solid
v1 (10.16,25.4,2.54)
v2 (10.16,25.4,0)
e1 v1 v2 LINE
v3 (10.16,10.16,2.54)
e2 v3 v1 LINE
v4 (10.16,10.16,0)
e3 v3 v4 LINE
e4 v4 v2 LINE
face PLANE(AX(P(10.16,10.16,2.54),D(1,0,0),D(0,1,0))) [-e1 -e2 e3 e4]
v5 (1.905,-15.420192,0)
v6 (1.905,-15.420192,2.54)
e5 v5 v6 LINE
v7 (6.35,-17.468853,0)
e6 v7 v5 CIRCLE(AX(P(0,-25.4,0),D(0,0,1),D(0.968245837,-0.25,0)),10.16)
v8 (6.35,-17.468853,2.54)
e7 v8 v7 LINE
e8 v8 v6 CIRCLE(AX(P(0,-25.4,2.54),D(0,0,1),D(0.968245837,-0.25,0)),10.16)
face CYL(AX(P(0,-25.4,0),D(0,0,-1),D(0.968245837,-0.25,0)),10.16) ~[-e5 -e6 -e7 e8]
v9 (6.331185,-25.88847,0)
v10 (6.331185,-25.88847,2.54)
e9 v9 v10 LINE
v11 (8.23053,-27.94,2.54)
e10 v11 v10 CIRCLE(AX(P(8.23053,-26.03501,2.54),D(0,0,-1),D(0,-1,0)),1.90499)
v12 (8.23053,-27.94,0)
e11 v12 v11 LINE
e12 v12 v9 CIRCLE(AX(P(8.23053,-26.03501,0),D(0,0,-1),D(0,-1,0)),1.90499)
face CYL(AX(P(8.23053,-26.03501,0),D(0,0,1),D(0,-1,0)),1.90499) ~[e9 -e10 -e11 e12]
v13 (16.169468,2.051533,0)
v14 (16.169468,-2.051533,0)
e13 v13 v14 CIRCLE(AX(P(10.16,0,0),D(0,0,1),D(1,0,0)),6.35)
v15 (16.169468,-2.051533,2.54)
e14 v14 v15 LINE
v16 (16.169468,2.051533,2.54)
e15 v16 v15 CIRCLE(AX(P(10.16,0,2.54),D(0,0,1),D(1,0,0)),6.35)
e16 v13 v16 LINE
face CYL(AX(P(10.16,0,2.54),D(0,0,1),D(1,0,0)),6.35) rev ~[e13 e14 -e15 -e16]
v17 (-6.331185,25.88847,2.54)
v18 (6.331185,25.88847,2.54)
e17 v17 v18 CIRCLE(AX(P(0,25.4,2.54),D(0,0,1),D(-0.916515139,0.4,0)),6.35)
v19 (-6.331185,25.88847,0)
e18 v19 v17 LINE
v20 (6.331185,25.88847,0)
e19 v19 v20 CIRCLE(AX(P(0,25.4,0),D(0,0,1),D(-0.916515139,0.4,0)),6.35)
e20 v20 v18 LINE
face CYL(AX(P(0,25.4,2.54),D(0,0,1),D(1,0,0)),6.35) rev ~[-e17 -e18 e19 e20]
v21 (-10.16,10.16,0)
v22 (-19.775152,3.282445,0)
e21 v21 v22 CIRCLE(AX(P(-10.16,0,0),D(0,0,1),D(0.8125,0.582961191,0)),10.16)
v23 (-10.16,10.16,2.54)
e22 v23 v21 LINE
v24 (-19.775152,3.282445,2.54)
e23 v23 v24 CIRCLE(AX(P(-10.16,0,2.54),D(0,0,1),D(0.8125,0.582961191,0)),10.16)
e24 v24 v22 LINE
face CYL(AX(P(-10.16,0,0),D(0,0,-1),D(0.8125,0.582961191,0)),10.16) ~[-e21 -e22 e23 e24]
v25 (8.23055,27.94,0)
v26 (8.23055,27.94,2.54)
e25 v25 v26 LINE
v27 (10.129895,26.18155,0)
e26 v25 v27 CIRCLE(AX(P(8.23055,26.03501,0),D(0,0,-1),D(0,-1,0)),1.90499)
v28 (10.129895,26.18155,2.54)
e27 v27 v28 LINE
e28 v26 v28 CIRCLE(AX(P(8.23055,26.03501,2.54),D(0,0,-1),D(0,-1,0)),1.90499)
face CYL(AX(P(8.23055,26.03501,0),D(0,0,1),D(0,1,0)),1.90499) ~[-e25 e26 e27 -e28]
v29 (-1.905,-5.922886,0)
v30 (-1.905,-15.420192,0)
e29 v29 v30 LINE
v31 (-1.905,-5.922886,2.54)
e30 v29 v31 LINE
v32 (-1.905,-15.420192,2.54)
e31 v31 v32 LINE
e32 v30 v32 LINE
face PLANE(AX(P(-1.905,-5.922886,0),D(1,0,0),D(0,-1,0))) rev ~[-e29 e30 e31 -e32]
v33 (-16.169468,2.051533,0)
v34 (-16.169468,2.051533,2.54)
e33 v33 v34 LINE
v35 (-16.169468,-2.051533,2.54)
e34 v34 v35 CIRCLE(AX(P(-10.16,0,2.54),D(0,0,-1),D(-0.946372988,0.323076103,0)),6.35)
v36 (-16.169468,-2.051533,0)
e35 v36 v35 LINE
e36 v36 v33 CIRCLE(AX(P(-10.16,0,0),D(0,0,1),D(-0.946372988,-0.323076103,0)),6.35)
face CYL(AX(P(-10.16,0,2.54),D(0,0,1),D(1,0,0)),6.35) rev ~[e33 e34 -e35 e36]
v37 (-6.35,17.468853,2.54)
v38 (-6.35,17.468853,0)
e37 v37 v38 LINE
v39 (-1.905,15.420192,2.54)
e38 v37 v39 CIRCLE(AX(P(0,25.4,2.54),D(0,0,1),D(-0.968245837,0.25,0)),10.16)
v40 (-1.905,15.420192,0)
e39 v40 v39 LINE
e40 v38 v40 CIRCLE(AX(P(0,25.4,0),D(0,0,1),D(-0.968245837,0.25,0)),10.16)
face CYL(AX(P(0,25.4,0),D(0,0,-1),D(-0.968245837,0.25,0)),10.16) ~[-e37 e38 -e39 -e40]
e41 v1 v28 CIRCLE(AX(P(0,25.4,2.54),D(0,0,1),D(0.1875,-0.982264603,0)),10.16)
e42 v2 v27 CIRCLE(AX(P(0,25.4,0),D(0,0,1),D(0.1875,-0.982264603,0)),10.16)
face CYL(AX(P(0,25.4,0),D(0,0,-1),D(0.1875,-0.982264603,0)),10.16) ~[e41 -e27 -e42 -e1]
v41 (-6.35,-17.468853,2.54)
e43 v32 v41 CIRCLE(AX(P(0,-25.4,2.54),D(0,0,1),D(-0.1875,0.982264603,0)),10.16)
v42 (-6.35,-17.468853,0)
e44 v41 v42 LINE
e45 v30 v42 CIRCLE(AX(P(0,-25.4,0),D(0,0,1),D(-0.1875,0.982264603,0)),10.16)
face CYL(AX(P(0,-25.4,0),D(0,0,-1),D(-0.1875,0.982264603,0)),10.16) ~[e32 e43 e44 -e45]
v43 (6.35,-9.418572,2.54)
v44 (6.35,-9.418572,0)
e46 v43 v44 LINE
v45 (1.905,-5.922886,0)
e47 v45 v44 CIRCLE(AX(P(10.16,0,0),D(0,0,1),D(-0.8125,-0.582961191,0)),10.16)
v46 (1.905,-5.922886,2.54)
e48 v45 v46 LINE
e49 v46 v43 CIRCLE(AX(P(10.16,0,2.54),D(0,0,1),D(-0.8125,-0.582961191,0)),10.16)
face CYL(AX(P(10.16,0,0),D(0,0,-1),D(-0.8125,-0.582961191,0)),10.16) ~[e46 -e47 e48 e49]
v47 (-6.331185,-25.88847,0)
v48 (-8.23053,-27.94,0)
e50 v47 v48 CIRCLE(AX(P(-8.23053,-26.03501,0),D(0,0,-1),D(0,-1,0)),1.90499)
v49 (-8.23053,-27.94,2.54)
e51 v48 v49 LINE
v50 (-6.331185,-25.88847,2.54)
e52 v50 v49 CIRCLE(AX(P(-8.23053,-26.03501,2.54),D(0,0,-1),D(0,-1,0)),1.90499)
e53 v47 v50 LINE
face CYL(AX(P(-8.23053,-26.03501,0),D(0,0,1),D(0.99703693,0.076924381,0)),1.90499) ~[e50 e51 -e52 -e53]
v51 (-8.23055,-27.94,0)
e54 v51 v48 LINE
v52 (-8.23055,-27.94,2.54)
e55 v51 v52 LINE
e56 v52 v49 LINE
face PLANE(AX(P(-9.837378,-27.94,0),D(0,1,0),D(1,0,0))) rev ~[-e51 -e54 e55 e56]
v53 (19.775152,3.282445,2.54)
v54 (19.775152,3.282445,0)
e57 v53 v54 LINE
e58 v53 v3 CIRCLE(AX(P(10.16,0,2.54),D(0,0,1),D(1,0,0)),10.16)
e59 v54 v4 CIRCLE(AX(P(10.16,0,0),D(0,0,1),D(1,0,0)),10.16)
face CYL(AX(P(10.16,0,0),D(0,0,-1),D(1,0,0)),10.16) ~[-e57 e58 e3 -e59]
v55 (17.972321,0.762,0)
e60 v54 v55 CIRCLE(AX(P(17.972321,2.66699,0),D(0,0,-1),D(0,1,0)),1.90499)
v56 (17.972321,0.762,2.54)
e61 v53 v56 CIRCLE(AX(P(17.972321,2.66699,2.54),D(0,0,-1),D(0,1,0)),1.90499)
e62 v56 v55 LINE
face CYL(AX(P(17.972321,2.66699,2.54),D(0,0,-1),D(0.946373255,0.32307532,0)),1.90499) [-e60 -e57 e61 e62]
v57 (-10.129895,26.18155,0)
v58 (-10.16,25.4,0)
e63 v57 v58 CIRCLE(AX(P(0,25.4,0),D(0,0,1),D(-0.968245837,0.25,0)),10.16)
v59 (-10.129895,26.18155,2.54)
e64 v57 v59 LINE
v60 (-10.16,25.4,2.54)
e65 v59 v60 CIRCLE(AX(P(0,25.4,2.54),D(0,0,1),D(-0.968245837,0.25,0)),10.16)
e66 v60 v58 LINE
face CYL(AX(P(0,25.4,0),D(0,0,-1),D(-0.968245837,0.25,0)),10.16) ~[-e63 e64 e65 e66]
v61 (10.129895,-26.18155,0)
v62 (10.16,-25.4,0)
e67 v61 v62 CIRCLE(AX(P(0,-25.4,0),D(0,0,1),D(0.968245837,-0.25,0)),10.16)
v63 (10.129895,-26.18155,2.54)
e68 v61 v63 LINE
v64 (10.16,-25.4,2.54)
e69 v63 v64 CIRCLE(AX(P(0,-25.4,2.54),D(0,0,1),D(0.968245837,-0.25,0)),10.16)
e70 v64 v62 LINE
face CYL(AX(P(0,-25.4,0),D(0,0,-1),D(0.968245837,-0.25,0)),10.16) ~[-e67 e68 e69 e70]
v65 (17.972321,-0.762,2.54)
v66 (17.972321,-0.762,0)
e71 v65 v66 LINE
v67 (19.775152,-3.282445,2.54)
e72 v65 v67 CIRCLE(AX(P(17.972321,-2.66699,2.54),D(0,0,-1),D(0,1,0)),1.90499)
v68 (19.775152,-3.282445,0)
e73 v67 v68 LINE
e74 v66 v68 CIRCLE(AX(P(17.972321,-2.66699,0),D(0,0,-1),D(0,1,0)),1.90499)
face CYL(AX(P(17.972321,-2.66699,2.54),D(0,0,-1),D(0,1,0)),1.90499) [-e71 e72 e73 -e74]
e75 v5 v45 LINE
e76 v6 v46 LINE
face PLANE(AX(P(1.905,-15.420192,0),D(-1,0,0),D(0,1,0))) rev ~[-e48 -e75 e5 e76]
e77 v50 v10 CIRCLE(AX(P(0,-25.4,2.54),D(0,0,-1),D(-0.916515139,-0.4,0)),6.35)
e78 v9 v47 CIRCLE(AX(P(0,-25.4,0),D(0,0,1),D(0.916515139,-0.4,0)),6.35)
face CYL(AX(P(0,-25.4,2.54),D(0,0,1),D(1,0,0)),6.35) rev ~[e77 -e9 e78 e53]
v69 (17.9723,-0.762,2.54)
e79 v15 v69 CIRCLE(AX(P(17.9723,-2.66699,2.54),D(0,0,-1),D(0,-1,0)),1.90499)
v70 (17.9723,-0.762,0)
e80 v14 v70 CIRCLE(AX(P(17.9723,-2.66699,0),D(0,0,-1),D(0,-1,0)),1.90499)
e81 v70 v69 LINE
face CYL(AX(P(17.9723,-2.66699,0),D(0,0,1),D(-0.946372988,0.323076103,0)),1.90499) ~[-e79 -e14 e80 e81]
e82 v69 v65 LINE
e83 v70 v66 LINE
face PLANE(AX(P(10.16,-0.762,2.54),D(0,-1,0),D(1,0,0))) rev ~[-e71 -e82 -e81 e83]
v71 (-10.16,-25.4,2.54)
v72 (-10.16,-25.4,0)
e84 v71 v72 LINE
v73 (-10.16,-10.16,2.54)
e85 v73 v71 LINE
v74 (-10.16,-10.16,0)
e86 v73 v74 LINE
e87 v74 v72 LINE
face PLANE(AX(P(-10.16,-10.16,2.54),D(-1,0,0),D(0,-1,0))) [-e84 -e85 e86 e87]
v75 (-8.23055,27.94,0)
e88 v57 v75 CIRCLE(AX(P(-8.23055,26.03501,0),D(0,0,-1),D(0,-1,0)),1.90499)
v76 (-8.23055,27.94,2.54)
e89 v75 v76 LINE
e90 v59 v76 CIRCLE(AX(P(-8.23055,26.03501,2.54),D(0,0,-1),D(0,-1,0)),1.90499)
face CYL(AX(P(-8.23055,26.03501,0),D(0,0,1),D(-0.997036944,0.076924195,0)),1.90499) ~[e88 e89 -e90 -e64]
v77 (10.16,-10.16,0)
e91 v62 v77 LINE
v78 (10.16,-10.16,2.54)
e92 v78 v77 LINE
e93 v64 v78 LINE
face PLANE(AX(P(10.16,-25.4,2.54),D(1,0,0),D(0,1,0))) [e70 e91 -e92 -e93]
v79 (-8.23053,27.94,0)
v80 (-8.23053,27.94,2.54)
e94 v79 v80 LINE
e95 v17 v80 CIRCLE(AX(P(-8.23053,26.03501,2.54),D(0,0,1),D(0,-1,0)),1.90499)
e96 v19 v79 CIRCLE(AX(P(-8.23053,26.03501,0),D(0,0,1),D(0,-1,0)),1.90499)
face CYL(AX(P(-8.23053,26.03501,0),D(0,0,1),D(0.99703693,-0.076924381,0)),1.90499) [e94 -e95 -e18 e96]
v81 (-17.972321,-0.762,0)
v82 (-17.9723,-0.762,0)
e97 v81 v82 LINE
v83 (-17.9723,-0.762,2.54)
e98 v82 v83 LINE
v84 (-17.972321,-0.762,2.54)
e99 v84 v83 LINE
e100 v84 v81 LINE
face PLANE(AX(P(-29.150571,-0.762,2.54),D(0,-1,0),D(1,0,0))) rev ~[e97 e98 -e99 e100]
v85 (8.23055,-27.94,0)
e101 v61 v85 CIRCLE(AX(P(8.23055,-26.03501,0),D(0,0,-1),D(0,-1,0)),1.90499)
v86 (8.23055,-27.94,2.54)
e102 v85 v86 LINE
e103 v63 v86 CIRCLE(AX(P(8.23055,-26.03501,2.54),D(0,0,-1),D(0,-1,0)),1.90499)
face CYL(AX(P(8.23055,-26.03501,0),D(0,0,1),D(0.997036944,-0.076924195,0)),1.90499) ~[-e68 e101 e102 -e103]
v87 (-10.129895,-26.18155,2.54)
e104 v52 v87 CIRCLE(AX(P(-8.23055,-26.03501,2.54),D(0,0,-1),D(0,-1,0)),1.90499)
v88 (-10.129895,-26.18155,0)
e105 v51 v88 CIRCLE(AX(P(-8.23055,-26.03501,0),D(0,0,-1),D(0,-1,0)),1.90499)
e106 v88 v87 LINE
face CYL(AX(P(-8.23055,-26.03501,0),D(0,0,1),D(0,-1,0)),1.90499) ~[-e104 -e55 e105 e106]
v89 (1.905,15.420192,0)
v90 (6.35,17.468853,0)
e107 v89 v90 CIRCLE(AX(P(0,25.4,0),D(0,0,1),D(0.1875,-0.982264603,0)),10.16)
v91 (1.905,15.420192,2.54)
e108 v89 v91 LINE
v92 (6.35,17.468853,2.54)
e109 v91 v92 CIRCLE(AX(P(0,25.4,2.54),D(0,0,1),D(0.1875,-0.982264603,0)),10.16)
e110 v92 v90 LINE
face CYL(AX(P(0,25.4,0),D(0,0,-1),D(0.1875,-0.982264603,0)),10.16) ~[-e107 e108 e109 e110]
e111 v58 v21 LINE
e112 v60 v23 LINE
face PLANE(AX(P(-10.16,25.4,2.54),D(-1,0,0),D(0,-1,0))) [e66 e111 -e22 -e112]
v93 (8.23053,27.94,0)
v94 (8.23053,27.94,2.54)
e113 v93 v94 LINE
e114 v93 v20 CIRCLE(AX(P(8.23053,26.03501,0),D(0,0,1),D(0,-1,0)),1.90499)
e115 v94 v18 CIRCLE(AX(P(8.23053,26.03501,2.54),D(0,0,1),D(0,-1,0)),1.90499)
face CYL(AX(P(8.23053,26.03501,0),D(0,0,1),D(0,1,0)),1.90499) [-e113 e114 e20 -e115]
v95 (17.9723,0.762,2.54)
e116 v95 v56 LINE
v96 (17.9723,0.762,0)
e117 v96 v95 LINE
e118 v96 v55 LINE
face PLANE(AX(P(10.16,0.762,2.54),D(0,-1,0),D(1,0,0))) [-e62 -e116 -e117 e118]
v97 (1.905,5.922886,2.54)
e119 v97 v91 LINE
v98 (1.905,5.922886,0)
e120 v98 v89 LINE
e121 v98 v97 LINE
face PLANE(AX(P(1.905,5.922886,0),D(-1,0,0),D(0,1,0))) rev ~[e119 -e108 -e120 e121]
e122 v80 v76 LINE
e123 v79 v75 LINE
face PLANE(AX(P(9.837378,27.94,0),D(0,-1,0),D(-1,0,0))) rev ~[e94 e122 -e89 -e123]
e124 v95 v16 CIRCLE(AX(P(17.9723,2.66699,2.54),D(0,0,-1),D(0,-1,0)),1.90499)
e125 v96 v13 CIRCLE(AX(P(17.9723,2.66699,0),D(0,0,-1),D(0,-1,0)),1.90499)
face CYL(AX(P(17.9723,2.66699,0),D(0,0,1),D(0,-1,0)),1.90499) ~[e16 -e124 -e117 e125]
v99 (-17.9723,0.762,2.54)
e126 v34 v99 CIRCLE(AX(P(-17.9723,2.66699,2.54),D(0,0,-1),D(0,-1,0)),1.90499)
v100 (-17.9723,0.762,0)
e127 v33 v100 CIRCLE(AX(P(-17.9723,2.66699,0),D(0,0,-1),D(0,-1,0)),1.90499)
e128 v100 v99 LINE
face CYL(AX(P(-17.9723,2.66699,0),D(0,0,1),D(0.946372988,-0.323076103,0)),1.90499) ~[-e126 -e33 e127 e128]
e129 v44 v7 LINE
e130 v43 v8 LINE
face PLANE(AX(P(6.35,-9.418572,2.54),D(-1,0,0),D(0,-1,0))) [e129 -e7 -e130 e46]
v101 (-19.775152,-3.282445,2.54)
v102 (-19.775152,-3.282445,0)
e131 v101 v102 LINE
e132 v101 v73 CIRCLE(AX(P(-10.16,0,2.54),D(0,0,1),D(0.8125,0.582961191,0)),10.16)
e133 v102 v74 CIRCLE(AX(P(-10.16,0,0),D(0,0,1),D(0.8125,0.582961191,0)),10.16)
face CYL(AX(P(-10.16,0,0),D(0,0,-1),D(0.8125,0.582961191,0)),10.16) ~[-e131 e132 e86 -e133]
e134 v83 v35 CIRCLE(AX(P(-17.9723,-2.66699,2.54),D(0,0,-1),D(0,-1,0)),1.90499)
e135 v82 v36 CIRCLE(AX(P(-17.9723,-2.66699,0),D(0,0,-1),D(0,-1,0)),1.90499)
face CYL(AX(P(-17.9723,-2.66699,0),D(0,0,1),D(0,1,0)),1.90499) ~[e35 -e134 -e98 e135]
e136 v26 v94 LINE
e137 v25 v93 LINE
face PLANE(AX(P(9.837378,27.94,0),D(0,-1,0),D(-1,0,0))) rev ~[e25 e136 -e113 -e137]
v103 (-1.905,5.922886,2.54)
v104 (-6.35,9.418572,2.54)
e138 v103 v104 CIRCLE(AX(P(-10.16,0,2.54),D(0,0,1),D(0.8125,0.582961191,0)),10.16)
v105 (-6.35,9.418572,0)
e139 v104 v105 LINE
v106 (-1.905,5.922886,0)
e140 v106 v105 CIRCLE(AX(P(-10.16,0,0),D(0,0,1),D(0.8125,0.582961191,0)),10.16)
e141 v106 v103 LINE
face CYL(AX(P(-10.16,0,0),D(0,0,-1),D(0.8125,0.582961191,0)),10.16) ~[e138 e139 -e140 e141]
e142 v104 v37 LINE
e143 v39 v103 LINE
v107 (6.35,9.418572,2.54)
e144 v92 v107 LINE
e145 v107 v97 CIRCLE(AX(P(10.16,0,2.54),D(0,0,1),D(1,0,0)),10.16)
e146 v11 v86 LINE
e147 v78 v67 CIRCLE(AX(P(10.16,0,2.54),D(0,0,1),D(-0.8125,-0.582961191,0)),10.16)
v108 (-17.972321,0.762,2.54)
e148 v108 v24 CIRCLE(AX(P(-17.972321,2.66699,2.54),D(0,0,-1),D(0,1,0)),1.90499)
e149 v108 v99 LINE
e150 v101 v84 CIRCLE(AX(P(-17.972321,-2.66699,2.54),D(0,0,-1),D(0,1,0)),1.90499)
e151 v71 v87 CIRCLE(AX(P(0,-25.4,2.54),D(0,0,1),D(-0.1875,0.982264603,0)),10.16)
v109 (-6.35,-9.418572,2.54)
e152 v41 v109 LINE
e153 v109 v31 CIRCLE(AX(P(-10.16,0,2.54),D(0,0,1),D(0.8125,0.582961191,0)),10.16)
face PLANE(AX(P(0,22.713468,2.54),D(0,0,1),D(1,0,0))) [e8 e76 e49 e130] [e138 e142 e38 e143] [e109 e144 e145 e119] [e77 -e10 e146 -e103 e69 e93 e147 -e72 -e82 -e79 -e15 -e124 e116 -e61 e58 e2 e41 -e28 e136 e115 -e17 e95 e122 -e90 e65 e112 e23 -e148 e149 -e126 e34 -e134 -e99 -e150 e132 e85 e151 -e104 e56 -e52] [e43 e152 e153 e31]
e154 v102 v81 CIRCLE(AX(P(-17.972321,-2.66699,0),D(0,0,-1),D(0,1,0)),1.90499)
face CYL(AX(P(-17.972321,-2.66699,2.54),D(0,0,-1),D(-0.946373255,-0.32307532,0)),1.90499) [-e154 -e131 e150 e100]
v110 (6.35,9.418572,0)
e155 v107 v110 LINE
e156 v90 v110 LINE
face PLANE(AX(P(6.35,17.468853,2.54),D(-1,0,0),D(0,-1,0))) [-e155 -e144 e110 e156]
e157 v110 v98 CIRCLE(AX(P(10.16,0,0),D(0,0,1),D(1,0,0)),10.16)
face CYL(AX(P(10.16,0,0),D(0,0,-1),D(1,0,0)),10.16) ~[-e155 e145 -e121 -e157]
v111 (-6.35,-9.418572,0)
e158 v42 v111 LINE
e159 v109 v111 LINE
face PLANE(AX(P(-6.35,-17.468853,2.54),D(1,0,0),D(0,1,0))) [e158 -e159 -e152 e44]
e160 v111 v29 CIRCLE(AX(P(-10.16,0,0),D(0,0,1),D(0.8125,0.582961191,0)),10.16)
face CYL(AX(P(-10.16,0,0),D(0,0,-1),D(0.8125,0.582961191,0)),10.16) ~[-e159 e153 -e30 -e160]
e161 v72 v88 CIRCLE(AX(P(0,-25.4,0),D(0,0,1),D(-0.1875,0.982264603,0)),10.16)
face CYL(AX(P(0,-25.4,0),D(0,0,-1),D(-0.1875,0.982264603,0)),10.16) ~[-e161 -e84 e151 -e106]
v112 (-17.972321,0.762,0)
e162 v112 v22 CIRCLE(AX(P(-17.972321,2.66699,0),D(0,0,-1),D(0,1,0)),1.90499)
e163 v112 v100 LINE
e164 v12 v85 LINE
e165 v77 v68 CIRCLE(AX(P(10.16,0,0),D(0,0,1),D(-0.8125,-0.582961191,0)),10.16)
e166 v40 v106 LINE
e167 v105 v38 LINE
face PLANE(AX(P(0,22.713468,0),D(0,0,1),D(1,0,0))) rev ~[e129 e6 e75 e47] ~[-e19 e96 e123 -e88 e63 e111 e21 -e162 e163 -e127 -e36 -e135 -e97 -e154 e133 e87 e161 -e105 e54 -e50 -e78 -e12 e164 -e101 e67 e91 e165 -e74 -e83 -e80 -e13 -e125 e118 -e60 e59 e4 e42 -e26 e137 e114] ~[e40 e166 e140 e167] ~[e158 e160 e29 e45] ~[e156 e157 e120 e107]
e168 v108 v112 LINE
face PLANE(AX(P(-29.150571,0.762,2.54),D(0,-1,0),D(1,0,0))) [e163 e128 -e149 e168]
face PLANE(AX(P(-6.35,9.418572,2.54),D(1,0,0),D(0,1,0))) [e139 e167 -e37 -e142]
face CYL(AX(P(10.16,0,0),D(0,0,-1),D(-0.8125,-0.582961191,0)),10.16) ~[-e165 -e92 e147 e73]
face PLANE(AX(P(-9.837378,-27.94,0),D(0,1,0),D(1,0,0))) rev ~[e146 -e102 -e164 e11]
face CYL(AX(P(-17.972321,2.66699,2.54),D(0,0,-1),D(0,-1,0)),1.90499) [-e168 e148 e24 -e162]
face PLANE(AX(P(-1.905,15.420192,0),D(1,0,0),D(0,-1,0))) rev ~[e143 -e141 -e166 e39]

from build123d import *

# Parameters (mm, degrees)
F1_DEPTH = 2.54
F2_R     = 6.35
F3_DEPTH = 25.4
F5_DEPTH = 2.54
F6_W     = 18.9905706793
F6_H     = 1.524
F7_DEPTH = 25.4
F8_R     = 1.90499


# Not quite as in the source:
# - a fillet or chamfer is up to 0.001 mm smaller than in the source, because OpenCascade refuses the exact size


with BuildPart() as f1:
    # F0 (on Top) → F1 (new body)
    with BuildSketch(Plane.XY):
        with BuildLine():
            Line((9.8373776994, 27.94), (-9.8373776994, 27.94))
            ThreePointArc((-9.8373776994, 27.94), (-8.5823807234, 19.962322084), (-1.905, 15.4201916351))
            Line((-1.905, 15.4201916351), (-1.905, 25.4))
            Line((-1.905, 25.4), (1.905, 25.4))
            Line((1.905, 25.4), (1.905, 15.4201916351))
            ThreePointArc((1.905, 15.4201916351), (8.5823807234, 19.962322084), (9.8373776994, 27.94))
        make_face()
        with BuildLine():
            Line((-1.905, 25.4), (-1.905, 15.4201916351))
            ThreePointArc((-1.905, 15.4201916351), (0, 15.24), (1.905, 15.4201916351))
            Line((1.905, 15.4201916351), (1.905, 25.4))
            Line((1.905, 25.4), (-1.905, 25.4))
        make_face()
        with BuildLine():
            ThreePointArc((1.905, 15.4201916351), (0, 15.24), (-1.905, 15.4201916351))
            Line((-1.905, 15.4201916351), (-1.905, 5.9228856987))
            ThreePointArc((-1.905, 5.9228856987), (-0.4879681556, 3.1108519733), (0, 0))
            ThreePointArc((0, 0), (0.4879681556, 3.1108519733), (1.905, 5.9228856987))
            Line((1.905, 5.9228856987), (1.905, 15.4201916351))
        make_face()
        with BuildLine():
            ThreePointArc((0, 0), (-0.4879681556, 3.1108519733), (-1.905, 5.9228856987))
            Line((-1.905, 5.9228856987), (-1.905, -5.9228856987))
            ThreePointArc((-1.905, -5.9228856987), (-0.4879681556, -3.1108519733), (0, 0))
        make_face()
        with BuildLine():
            Line((-1.905, -5.9228856987), (-1.905, 5.9228856987))
            ThreePointArc((-1.905, 5.9228856987), (-20.32, 0), (-1.905, -5.9228856987))
        make_face()
        with BuildLine():
            ThreePointArc((20.32, 0), (13.2708519733, 9.6720318444), (1.905, 5.9228856987))
            Line((1.905, 5.9228856987), (1.905, -5.9228856987))
            ThreePointArc((1.905, -5.9228856987), (13.2708519733, -9.6720318444), (20.32, 0))
        make_face()
        with BuildLine():
            Line((1.905, -5.9228856987), (1.905, 5.9228856987))
            ThreePointArc((1.905, 5.9228856987), (0.4879681556, 3.1108519733), (0, 0))
            ThreePointArc((0, 0), (0.4879681556, -3.1108519733), (1.905, -5.9228856987))
        make_face()
        with BuildLine():
            ThreePointArc((0, 0), (-0.4879681556, -3.1108519733), (-1.905, -5.9228856987))
            Line((-1.905, -5.9228856987), (-1.905, -15.4201916351))
            ThreePointArc((-1.905, -15.4201916351), (0, -15.24), (1.905, -15.4201916351))
            Line((1.905, -15.4201916351), (1.905, -5.9228856987))
            ThreePointArc((1.905, -5.9228856987), (0.4879681556, -3.1108519733), (0, 0))
        make_face()
        with BuildLine():
            Line((-1.905, -25.4), (-1.905, -15.4201916351))
            ThreePointArc((-1.905, -15.4201916351), (-8.5823807234, -19.962322084), (-9.8373776994, -27.94))
            Line((-9.8373776994, -27.94), (9.8373776994, -27.94))
            ThreePointArc((9.8373776994, -27.94), (8.5823807234, -19.962322084), (1.905, -15.4201916351))
            Line((1.905, -15.4201916351), (1.905, -25.4))
            Line((1.905, -25.4), (-1.905, -25.4))
        make_face()
        with BuildLine():
            ThreePointArc((1.905, -15.4201916351), (0, -15.24), (-1.905, -15.4201916351))
            Line((-1.905, -15.4201916351), (-1.905, -25.4))
            Line((-1.905, -25.4), (1.905, -25.4))
            Line((1.905, -25.4), (1.905, -15.4201916351))
        make_face()
    extrude(amount=F1_DEPTH)

    # F2 (on face) → F3 (cut)
    with BuildSketch(Plane.XY.offset(2.54)):
        with Locations((0, 25.4)):
            Circle(F2_R)
        with Locations((10.16, 0)):
            Circle(F2_R)
        with Locations((-10.16, 0)):
            Circle(F2_R)
        with Locations((0, -25.4)):
            Circle(F2_R)
    extrude(amount=-F3_DEPTH, mode=Mode.SUBTRACT)

    # F4 (on face) → F5 (join, through all)
    with BuildSketch(Plane.XY.offset(2.54)):
        with BuildLine():
            ThreePointArc((6.35, -17.468852542), (9.1581002397, -21.0005909488), (10.16, -25.4))
            Line((10.16, -25.4), (10.16, -10.16))
            ThreePointArc((10.16, -10.16), (8.2192646134, -9.9729206434), (6.35, -9.4185720786))
            Line((6.35, -9.4185720786), (6.35, -17.468852542))
        make_face()
        with BuildLine():
            ThreePointArc((-10.16, -25.4), (-9.1581002397, -21.0005909488), (-6.35, -17.468852542))
            Line((-6.35, -17.468852542), (-6.35, -9.4185720786))
            ThreePointArc((-6.35, -9.4185720786), (-8.2192646134, -9.9729206434), (-10.16, -10.16))
            Line((-10.16, -10.16), (-10.16, -25.4))
        make_face()
        with BuildLine():
            Line((10.16, 10.16), (10.16, 25.4))
            ThreePointArc((10.16, 25.4), (9.1581002397, 21.0005909488), (6.35, 17.468852542))
            Line((6.35, 17.468852542), (6.35, 9.4185720786))
            ThreePointArc((6.35, 9.4185720786), (8.2192646134, 9.9729206434), (10.16, 10.16))
        make_face()
        with BuildLine():
            ThreePointArc((-6.35, 17.468852542), (-9.1581002397, 21.0005909488), (-10.16, 25.4))
            Line((-10.16, 25.4), (-10.16, 10.16))
            ThreePointArc((-10.16, 10.16), (-8.2192646134, 9.9729206434), (-6.35, 9.4185720786))
            Line((-6.35, 9.4185720786), (-6.35, 17.468852542))
        make_face()
    extrude(amount=-F5_DEPTH)

    # F6 (on face) → F7 (cut)
    with BuildSketch(Plane.XY.offset(2.54)):
        with Locations((19.6552853397, 0)):
            Rectangle(F6_W, F6_H)
        with Locations((-19.6552853397, 0)):
            Rectangle(F6_W, F6_H)
    extrude(amount=-F7_DEPTH, mode=Mode.SUBTRACT)

    # F8 (radius 1.905 in the source; OpenCascade refuses exactly that, so slightly less here)
    f8_edges = [f1.edges().sort_by_distance(p)[0] for p in [
        (20.291385, -0.762, 1.27),
        (20.291385, 0.762, 1.27),
        (16.464114, -0.762, 1.27),
        (16.464114, 0.762, 1.27),
        (5.819871, -27.94, 1.27),
        (-5.819871, -27.94, 1.27),
        (9.837378, -27.94, 1.27),
        (-20.291385, 0.762, 1.27),
        (-20.291385, -0.762, 1.27),
        (-16.464114, -0.762, 1.27),
        (-16.464114, 0.762, 1.27),
        (-9.837378, 27.94, 1.27),
        (5.819871, 27.94, 1.27),
        (-5.819871, 27.94, 1.27),
        (9.837378, 27.94, 1.27),
        (-9.837378, -27.94, 1.27),
    ]]
    fillet(f8_edges, radius=F8_R)


solid = f1.part
